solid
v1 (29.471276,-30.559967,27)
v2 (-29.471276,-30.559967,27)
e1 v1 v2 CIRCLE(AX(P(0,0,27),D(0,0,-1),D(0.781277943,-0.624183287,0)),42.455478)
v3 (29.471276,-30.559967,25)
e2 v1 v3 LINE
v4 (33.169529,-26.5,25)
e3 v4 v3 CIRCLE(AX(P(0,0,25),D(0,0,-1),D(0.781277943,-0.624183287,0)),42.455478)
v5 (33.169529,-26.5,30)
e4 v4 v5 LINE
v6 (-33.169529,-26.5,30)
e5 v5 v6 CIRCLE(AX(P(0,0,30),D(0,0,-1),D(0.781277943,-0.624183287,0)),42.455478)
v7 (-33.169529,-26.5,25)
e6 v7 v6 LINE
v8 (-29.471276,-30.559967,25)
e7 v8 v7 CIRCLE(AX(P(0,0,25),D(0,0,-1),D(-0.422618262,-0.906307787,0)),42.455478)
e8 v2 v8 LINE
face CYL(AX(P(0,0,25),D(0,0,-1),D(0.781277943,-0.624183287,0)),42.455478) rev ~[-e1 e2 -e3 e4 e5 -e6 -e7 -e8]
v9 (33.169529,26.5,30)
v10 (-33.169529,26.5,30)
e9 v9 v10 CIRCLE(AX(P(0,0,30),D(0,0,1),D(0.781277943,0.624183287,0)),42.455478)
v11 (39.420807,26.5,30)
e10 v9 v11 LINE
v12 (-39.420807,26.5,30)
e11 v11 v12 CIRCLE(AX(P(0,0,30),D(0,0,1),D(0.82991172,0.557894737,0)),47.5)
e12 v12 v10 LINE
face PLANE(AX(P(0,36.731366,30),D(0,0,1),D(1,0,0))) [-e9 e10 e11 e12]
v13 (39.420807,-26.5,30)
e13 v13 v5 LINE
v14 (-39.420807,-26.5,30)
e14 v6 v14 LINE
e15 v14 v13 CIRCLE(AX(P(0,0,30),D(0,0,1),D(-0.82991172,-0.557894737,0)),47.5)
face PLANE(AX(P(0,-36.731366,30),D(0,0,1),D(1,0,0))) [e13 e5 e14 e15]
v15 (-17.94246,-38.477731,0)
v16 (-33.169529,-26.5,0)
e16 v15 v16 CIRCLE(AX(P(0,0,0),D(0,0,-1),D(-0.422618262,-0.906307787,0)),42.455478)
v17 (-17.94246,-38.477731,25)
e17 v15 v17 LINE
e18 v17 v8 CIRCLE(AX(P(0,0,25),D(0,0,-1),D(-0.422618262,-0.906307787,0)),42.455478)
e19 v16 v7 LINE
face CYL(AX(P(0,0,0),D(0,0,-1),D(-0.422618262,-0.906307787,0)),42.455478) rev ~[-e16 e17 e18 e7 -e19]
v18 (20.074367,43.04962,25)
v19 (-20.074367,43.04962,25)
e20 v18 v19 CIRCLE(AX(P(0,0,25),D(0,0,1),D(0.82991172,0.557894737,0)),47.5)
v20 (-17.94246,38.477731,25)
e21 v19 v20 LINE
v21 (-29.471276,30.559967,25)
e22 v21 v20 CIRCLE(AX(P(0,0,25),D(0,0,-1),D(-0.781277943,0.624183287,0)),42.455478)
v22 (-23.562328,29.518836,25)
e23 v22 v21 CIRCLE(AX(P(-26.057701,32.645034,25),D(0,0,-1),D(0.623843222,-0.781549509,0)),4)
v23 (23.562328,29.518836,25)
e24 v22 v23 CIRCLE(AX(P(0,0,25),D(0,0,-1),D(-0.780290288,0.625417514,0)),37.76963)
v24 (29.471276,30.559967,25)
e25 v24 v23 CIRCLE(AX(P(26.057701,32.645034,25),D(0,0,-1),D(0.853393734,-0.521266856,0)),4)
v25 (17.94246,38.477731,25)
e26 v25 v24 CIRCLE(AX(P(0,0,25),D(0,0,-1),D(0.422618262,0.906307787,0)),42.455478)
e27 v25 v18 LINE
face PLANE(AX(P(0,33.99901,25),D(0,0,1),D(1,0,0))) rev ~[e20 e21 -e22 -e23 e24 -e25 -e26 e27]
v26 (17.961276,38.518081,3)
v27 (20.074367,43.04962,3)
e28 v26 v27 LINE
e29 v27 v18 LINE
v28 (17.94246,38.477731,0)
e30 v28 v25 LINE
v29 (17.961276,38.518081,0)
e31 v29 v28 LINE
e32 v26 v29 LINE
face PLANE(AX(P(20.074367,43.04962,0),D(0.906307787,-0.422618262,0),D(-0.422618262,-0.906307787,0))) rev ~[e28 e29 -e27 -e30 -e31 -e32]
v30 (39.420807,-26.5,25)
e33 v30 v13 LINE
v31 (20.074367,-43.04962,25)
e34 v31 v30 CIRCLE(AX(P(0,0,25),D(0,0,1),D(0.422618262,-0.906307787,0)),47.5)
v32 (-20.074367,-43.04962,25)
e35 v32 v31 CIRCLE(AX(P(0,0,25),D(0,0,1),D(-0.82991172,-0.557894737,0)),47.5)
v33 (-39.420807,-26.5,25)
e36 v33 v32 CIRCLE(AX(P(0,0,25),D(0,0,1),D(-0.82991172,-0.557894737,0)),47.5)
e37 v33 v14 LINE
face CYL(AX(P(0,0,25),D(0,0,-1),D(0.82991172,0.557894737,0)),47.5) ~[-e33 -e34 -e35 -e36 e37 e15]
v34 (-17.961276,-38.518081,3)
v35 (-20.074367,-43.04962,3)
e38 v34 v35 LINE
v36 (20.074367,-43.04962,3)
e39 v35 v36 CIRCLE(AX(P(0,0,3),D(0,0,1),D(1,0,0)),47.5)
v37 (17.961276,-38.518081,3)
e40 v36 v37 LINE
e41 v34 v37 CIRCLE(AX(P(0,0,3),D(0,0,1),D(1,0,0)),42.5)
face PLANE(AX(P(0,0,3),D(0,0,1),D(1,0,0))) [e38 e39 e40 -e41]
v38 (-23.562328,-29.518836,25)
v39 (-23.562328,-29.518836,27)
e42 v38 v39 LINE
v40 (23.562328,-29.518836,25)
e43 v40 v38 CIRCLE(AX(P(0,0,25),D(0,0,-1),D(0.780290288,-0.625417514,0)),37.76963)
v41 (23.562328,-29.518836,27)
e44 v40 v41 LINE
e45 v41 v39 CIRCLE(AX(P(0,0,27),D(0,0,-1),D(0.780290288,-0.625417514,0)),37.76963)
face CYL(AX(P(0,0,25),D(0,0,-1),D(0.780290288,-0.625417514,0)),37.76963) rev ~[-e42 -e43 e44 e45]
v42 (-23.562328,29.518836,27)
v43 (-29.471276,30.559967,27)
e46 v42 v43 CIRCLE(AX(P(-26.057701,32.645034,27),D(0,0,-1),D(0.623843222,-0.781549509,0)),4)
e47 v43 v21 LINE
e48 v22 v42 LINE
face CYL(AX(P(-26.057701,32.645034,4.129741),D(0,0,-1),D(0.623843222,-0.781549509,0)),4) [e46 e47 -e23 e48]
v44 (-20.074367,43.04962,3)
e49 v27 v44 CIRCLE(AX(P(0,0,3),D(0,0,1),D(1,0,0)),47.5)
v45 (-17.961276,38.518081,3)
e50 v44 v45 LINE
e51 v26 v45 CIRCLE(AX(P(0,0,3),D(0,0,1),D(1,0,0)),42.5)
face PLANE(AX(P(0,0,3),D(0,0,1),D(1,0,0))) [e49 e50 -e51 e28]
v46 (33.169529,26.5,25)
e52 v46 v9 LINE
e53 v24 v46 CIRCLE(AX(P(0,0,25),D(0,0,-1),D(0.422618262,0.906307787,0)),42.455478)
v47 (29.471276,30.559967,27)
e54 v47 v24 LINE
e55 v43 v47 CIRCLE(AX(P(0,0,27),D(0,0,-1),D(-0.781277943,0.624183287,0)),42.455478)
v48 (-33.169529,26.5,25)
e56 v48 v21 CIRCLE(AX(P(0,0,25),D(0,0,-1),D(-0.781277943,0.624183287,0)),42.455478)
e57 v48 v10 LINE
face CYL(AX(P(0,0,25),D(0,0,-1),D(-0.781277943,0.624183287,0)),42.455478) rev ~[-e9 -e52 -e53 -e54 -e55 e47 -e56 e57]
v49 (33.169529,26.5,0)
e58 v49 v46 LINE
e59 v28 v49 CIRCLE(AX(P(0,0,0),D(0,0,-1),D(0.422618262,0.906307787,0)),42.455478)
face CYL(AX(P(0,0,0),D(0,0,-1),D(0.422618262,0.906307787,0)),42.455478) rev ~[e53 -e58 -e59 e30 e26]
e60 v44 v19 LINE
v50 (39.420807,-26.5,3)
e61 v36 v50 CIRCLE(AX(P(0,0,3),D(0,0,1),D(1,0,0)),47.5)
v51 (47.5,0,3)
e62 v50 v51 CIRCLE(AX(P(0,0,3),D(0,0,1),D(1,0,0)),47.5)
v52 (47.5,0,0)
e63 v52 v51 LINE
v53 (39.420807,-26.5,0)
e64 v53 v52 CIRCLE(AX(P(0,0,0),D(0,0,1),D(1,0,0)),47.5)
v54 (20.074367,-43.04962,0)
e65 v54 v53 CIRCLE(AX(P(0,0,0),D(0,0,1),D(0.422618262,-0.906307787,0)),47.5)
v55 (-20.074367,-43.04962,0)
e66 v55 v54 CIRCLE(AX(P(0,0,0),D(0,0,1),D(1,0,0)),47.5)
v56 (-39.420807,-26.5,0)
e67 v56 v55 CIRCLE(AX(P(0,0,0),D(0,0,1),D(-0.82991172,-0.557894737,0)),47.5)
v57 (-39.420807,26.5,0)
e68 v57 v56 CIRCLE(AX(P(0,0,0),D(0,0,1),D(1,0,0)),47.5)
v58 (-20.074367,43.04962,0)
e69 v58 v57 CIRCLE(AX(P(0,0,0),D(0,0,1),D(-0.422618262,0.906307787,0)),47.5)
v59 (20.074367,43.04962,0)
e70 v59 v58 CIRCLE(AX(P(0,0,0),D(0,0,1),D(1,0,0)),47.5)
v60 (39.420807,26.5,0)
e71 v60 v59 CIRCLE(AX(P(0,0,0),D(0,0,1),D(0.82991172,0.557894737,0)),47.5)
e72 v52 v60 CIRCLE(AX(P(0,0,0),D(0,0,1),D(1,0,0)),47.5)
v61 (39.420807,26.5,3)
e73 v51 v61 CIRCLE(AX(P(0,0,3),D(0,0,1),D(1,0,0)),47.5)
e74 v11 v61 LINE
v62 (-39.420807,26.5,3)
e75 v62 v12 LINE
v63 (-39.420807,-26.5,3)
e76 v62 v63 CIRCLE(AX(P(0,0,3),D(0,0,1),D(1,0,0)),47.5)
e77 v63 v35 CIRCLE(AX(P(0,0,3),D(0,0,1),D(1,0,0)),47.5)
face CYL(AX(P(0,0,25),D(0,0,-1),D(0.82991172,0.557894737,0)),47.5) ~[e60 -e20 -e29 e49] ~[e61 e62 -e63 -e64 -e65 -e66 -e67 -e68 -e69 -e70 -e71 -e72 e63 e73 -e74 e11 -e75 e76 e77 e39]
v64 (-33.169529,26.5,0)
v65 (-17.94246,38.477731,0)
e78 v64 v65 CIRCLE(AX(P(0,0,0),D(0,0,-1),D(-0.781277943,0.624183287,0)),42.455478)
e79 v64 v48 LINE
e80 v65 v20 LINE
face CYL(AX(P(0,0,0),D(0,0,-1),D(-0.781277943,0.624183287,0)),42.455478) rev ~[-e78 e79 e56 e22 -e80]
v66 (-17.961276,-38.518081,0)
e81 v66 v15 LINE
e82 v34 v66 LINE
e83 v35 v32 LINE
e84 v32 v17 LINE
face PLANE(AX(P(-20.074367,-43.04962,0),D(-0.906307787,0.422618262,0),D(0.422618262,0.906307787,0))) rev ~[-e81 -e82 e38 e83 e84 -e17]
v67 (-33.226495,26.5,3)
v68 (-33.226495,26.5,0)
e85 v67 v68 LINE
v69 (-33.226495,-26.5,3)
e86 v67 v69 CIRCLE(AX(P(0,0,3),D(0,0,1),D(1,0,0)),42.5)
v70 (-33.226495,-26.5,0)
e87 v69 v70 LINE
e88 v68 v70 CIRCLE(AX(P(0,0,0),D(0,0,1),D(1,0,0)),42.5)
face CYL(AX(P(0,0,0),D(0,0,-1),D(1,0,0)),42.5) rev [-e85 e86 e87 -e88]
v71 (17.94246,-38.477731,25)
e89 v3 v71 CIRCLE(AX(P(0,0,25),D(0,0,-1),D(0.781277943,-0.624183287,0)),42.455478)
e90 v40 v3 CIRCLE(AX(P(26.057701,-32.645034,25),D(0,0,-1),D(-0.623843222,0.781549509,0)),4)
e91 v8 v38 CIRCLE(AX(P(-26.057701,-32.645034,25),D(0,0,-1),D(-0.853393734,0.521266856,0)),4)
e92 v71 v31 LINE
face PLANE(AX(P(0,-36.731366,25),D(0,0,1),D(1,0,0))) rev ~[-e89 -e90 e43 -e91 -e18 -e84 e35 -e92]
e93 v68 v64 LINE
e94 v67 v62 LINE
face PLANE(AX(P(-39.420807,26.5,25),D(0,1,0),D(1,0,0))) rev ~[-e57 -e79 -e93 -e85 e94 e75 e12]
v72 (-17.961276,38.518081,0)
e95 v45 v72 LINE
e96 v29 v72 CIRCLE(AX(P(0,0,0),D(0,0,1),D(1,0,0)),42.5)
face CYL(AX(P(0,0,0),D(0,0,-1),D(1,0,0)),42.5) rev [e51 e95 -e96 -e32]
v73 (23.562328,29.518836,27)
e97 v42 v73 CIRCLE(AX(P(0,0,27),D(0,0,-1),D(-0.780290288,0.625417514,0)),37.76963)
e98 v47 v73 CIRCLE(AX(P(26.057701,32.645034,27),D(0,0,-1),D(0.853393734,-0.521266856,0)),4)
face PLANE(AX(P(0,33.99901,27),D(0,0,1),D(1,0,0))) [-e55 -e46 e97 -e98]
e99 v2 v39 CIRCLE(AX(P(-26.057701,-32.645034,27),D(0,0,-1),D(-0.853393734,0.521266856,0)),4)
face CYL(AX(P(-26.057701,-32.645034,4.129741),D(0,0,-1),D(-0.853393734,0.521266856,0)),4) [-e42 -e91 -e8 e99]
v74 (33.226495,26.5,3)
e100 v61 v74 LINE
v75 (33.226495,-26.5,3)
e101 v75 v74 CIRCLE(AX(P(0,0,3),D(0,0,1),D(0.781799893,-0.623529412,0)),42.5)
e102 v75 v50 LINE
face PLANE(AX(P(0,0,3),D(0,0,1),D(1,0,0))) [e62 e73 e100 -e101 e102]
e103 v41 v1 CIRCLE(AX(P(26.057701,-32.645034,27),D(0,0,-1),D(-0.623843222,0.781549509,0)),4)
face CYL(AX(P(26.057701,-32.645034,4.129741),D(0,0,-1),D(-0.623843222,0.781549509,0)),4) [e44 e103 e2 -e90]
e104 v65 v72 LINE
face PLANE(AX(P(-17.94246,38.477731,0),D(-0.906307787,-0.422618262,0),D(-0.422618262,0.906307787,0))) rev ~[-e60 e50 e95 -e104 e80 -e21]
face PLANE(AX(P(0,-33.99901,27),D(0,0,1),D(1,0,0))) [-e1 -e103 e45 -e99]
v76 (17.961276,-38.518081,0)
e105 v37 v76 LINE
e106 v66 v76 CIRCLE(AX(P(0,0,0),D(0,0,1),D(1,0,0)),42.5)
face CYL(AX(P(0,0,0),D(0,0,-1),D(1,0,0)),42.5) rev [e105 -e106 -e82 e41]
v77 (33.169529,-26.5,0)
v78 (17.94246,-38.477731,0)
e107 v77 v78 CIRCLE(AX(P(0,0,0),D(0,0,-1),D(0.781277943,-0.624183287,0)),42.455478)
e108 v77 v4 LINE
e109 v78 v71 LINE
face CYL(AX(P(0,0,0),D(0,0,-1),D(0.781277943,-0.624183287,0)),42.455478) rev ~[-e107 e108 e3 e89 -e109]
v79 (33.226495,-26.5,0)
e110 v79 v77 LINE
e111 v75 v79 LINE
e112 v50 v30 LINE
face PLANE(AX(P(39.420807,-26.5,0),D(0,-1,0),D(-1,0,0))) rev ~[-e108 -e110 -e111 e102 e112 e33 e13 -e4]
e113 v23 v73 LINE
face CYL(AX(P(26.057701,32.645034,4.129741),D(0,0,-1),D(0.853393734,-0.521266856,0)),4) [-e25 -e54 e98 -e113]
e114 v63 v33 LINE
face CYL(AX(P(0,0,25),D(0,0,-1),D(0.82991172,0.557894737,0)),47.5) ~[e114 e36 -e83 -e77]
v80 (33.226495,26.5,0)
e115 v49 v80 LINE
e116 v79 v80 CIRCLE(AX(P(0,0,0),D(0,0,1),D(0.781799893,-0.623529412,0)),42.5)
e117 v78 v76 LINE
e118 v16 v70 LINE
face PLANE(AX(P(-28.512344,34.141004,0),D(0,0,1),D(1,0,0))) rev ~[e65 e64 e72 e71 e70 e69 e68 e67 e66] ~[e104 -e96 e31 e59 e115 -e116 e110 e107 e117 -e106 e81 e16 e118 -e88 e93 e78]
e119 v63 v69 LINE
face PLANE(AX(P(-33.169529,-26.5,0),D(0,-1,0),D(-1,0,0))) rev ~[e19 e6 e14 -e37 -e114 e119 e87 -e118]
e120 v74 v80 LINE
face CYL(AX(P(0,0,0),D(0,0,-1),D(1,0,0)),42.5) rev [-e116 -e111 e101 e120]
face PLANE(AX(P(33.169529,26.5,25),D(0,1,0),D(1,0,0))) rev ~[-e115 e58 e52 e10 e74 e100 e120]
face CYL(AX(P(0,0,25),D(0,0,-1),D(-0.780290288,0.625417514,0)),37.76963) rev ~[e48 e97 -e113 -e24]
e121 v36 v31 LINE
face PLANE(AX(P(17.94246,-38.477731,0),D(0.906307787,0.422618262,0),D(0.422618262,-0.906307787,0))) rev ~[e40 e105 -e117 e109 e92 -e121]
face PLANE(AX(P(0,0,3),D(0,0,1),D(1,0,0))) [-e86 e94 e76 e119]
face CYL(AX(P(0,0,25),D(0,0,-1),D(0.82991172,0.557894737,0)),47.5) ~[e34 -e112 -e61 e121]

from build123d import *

# Parameters (mm, degrees)
F0_R        = 47.5
F0_R_2      = 42.5
F1_DEPTH    = 3
F3_DEPTH    = 25
F7_DEPTH    = 5
F8_DEPTH    = 2
F9_T1_DEPTH = 43.7405186698


# Not quite as in the source:
# - a fillet or chamfer that OpenCascade refuses, or shapes differently, is made with other operations: its cross-section is extruded or revolved along the edge and cut away or added


with BuildPart() as f1:
    # F0 (on Top) → F1 (new body)
    with BuildSketch(Plane.XY):
        Circle(F0_R)
        Circle(F0_R_2, mode=Mode.SUBTRACT)
    extrude(amount=F1_DEPTH)

    # F2 (on Top) → F3 (join)
    with BuildSketch(Plane.XY):
        with BuildLine():
            Line((-17.9424604553, 38.4777306174), (-20.0743674327, 43.0496198842))
            ThreePointArc((-20.0743674327, 43.0496198842), (-30.8770370262, 36.0951324209), (-39.4208066889, 26.5))
            Line((-39.4208066889, 26.5), (-33.1695287976, 26.5))
            ThreePointArc((-33.1695287976, 26.5), (-26.2483403101, 33.3690316255), (-17.9424604553, 38.4777306174))
        make_face()
        with BuildLine():
            Line((-20.0743674327, -43.0496198842), (-17.9424604553, -38.4777306174))
            ThreePointArc((-17.9424604553, -38.4777306174), (-26.2483403101, -33.3690316255), (-33.1695287976, -26.5))
            Line((-33.1695287976, -26.5), (-39.4208066889, -26.5))
            ThreePointArc((-39.4208066889, -26.5), (-30.8770370262, -36.0951324209), (-20.0743674327, -43.0496198842))
        make_face()
        with BuildLine():
            Line((20.0743674327, 43.0496198842), (17.9424604553, 38.4777306174))
            ThreePointArc((17.9424604553, 38.4777306174), (26.2483403101, 33.3690316255), (33.1695287976, 26.5))
            Line((33.1695287976, 26.5), (39.4208066889, 26.5))
            ThreePointArc((39.4208066889, 26.5), (30.8770370262, 36.0951324209), (20.0743674327, 43.0496198842))
        make_face()
        with BuildLine():
            ThreePointArc((33.1695287976, -26.5), (26.2483403101, -33.3690316255), (17.9424604553, -38.4777306174))
            Line((17.9424604553, -38.4777306174), (20.0743674327, -43.0496198842))
            ThreePointArc((20.0743674327, -43.0496198842), (30.8770370262, -36.0951324209), (39.4208066889, -26.5))
            Line((39.4208066889, -26.5), (33.1695287976, -26.5))
        make_face()
    extrude(amount=F3_DEPTH)

    # F4 (on face) → F7 (join)
    with BuildSketch(Plane.XY.offset(25)):
        with BuildLine():
            ThreePointArc((39.4208066889, 26.5), (0, 47.5), (-39.4208066889, 26.5))
            Line((-39.4208066889, 26.5), (-33.1695287976, 26.5))
            ThreePointArc((-33.1695287976, 26.5), (0, 42.455478335), (33.1695287976, 26.5))
            Line((33.1695287976, 26.5), (39.4208066889, 26.5))
        make_face()
        with BuildLine():
            Line((-33.1695287976, -26.5), (-39.4208066889, -26.5))
            ThreePointArc((-39.4208066889, -26.5), (0, -47.5), (39.4208066889, -26.5))
            Line((39.4208066889, -26.5), (33.1695287976, -26.5))
            ThreePointArc((33.1695287976, -26.5), (0, -42.455478335), (-33.1695287976, -26.5))
        make_face()
    extrude(amount=F7_DEPTH)

    # F6 (on offset) → F8 (join)
    with BuildSketch(Plane.XY.offset(25)):
        with BuildLine():
            ThreePointArc((-29.4712756106, -30.6217882215), (0, -42.5), (29.4712756106, -30.6217882215))
            Line((29.4712756106, -30.6217882215), (29.4712756106, -23.6217882215))
            ThreePointArc((29.4712756106, -23.6217882215), (0, -37.7696301928), (-29.4712756106, -23.6217882215))
            Line((-29.4712756106, -23.6217882215), (-29.4712756106, -30.6217882215))
        make_face()
        with BuildLine():
            Line((29.4712756106, 23.6217882215), (29.4712756106, 30.6217882215))
            ThreePointArc((29.4712756106, 30.6217882215), (0, 42.5), (-29.4712756106, 30.6217882215))
            Line((-29.4712756106, 30.6217882215), (-29.4712756106, 23.6217882215))
            ThreePointArc((-29.4712756106, 23.6217882215), (0, 37.7696301928), (29.4712756106, 23.6217882215))
        make_face()
    extrude(amount=F8_DEPTH)

    # F9: fillet of radius 4 on 4 edges, made by hand

    # F9_s2 → F9_t1 (cut)
    with BuildSketch(Plane.XY.offset(4.1297406651)):
        with BuildLine():
            ThreePointArc((-29.4712756106, -30.5599665337), (-26.7517914385, -28.7057144703), (-23.5623277872, -29.5188359213))
            ThreePointArc((-23.5623277872, -29.5188359213), (-26.6802279831, -26.7340681466), (-29.4712756106, -23.6217882215))
            Line((-29.4712756106, -23.6217882215), (-29.4712756106, -30.5599665337))
        make_face()
        with BuildLine():
            ThreePointArc((23.5623277872, -29.5188359213), (26.7517914385, -28.7057144703), (29.4712756106, -30.5599665337))
            Line((29.4712756106, -30.5599665337), (29.4712756106, -23.6217882215))
            ThreePointArc((29.4712756106, -23.6217882215), (26.6802279831, -26.7340681466), (23.5623277872, -29.5188359213))
        make_face()
        with BuildLine():
            ThreePointArc((29.4712756106, 30.5599665337), (26.7517914385, 28.7057144703), (23.5623277872, 29.5188359213))
            ThreePointArc((23.5623277872, 29.5188359213), (26.6802279831, 26.7340681466), (29.4712756106, 23.6217882215))
            Line((29.4712756106, 23.6217882215), (29.4712756106, 30.5599665337))
        make_face()
        with BuildLine():
            ThreePointArc((-23.5623277872, 29.5188359213), (-26.7517914385, 28.7057144703), (-29.4712756106, 30.5599665337))
            Line((-29.4712756106, 30.5599665337), (-29.4712756106, 23.6217882215))
            ThreePointArc((-29.4712756106, 23.6217882215), (-26.6802279831, 26.7340681466), (-23.5623277872, 29.5188359213))
        make_face()
    extrude(amount=F9_T1_DEPTH, mode=Mode.SUBTRACT)


solid = f1.part
